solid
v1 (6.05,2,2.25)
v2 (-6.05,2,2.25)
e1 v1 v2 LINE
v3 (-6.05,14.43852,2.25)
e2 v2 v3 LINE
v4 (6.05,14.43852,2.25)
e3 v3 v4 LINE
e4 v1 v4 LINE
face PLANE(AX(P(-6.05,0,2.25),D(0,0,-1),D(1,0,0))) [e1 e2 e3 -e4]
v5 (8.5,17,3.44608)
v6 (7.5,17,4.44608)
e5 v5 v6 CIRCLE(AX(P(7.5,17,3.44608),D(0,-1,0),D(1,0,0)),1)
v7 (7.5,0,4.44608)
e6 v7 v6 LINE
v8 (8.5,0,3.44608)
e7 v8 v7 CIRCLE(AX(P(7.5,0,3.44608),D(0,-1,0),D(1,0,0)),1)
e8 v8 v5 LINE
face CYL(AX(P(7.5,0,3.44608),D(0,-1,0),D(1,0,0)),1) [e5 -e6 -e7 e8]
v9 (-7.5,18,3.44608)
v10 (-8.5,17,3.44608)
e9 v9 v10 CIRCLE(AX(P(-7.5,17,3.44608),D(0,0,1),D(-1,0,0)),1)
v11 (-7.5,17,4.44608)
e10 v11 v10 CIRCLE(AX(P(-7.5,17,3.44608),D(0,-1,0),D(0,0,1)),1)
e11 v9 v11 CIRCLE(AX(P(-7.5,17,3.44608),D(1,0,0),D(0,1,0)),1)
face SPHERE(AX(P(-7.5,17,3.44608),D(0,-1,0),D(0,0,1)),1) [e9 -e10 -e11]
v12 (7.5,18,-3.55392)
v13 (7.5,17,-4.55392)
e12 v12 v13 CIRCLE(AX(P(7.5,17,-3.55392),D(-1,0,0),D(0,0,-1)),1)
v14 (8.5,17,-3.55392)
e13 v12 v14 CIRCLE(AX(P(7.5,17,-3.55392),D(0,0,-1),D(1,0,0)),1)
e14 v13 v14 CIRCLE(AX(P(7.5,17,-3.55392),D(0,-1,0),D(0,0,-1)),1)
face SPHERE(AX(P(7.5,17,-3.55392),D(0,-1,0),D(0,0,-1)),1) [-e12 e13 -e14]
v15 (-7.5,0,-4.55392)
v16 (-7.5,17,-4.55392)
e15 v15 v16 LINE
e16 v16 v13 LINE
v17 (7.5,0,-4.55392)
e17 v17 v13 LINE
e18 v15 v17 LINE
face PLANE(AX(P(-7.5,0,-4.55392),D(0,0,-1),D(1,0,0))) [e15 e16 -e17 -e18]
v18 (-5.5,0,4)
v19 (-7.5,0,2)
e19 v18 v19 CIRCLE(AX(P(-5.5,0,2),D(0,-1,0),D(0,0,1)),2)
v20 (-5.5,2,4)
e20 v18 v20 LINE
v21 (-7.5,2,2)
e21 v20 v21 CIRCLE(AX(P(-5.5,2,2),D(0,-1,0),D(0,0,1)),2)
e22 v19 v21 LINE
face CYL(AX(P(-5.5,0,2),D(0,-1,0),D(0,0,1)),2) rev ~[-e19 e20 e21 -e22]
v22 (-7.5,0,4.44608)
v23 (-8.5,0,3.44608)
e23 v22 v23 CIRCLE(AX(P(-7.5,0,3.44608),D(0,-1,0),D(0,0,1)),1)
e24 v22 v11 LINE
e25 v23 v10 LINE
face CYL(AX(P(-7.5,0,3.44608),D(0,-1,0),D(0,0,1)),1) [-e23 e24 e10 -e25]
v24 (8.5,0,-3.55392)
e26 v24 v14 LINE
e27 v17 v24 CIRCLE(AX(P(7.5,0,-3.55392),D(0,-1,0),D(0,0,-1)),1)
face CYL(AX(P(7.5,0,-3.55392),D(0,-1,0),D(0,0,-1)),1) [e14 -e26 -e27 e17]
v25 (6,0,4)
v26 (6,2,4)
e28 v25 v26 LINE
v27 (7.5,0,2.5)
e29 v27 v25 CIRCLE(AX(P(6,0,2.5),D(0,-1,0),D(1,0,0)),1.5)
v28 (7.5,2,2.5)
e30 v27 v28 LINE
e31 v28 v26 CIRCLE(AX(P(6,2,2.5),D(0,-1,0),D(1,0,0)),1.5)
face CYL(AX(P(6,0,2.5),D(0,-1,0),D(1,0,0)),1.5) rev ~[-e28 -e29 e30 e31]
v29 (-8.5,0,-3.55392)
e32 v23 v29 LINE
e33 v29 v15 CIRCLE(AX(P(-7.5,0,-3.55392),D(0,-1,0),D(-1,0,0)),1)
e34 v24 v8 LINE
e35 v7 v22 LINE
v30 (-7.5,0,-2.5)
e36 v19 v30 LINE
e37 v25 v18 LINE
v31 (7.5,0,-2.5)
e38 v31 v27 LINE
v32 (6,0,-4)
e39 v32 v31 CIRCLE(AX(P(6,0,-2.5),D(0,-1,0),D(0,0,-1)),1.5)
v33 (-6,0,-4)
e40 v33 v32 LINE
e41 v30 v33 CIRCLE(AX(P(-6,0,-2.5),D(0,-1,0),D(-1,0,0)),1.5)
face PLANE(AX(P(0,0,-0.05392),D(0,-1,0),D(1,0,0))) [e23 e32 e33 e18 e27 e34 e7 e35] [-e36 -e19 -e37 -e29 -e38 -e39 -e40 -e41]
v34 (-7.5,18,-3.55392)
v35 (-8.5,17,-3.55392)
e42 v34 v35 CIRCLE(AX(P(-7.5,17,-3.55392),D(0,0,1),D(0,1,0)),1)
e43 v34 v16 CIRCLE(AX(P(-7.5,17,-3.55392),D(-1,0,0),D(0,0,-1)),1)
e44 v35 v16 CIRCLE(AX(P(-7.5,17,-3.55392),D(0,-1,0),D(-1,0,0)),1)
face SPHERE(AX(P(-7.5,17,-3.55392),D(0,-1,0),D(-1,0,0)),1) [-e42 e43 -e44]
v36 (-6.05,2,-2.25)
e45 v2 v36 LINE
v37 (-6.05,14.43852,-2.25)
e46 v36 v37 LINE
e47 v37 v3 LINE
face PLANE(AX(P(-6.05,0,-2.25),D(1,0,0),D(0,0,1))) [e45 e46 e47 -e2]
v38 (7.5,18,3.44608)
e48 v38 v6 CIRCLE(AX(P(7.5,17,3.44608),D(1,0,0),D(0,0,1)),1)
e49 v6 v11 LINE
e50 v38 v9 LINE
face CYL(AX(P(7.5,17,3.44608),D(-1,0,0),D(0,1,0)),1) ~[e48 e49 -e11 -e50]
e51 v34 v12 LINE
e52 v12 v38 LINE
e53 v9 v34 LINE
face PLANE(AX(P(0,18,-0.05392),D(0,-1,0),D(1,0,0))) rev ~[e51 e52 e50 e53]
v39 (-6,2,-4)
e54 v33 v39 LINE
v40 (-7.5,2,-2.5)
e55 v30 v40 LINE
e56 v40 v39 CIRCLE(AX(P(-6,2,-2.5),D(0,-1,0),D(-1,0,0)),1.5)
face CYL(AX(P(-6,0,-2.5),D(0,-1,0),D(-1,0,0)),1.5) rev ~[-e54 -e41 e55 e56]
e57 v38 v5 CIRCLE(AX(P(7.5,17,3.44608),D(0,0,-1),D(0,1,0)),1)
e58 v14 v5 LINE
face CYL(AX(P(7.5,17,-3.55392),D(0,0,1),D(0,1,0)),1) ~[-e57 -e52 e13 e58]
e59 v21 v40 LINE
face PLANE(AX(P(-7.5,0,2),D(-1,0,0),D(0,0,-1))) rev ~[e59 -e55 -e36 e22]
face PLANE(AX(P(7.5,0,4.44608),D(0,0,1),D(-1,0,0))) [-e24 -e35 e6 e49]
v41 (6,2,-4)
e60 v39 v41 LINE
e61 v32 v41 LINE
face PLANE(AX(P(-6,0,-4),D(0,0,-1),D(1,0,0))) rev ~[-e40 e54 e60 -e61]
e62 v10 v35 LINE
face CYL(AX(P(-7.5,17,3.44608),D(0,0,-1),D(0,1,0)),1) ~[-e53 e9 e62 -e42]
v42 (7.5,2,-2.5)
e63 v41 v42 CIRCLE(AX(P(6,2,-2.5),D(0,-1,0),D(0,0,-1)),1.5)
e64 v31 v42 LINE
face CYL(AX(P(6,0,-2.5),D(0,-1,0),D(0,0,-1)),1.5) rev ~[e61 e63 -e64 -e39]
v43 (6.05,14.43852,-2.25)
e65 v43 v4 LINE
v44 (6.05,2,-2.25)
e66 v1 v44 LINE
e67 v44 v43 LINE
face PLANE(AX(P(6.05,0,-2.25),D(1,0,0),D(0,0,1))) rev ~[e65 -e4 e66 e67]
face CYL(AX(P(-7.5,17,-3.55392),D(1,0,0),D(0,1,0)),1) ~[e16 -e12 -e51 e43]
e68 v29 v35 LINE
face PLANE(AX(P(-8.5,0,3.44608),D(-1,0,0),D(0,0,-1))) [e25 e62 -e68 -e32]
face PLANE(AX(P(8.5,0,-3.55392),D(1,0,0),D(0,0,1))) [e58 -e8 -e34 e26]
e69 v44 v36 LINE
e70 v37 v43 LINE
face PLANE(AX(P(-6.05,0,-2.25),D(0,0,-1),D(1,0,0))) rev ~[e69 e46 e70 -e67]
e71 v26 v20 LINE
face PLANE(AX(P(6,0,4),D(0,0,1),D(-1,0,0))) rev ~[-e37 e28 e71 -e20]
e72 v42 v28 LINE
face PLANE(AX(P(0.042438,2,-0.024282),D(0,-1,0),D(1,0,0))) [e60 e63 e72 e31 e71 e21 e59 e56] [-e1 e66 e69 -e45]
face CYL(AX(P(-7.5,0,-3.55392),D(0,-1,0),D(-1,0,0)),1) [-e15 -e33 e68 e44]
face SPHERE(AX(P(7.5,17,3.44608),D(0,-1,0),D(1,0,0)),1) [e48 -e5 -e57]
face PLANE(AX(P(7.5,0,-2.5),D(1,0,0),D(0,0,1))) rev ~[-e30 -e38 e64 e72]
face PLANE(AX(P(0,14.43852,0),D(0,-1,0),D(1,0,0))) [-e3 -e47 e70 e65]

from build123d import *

# Parameters (mm, degrees)
F1_DEPTH = 18
F2_W     = 12.1
F2_H     = 4.5
F3_DEPTH = 14.43852
F5_DEPTH = 2
F6_R     = 1


# Not quite as in the source:
# - a feature names something its author has since deleted; it is built from what else it names


with BuildPart() as f1:
    # F0 (on Front) → F1 (new body)
    with BuildSketch(Plane.XZ):
        with BuildLine():
            ThreePointArc((8.5, 3.4460804202), (8.2071067812, 4.1531872014), (7.5, 4.4460804202))
            Line((7.5, 4.4460804202), (-7.5, 4.4460804202))
            ThreePointArc((-7.5, 4.4460804202), (-8.2071067812, 4.1531872014), (-8.5, 3.4460804202))
            Line((-8.5, 3.4460804202), (-8.5, -3.5539195798))
            ThreePointArc((-8.5, -3.5539195798), (-8.2071067812, -4.261026361), (-7.5, -4.5539195798))
            Line((-7.5, -4.5539195798), (7.5, -4.5539195798))
            ThreePointArc((7.5, -4.5539195798), (8.2071067812, -4.261026361), (8.5, -3.5539195798))
            Line((8.5, -3.5539195798), (8.5, 3.4460804202))
        make_face()
    extrude(amount=-F1_DEPTH)

    # F2 (on face) → F3 (cut)
    with BuildSketch(Plane.XZ):
        Rectangle(F2_W, F2_H)
    extrude(amount=-F3_DEPTH, mode=Mode.SUBTRACT)

    # F4 (on face) → F5 (cut)
    with BuildSketch(Plane.XZ):
        with BuildLine():
            Line((-6, -4), (6, -4))
            ThreePointArc((6, -4), (7.0606601718, -3.5606601718), (7.5, -2.5))
            Line((7.5, -2.5), (7.5, 2.5))
            ThreePointArc((7.5, 2.5), (7.0606601718, 3.5606601718), (6, 4))
            Line((6, 4), (-5.5, 4))
            ThreePointArc((-5.5, 4), (-6.9142135624, 3.4142135624), (-7.5, 2))
            Line((-7.5, 2), (-7.5, -2.5))
            ThreePointArc((-7.5, -2.5), (-7.0606601718, -3.5606601718), (-6, -4))
        make_face()
    extrude(amount=-F5_DEPTH, mode=Mode.SUBTRACT)

    # F6
    f6_edges = [f1.edges().sort_by_distance(p)[0] for p in [
        (8.207107, 18, -4.261026),
        (8.5, 18, -0.05392),
        (8.207107, 18, 4.153187),
        (0, 18, 4.44608),
        (-8.207107, 18, 4.153187),
        (-8.5, 18, -0.05392),
        (-8.207107, 18, -4.261026),
        (0, 18, -4.55392),
    ]]
    fillet(f6_edges, radius=F6_R)


solid = f1.part
